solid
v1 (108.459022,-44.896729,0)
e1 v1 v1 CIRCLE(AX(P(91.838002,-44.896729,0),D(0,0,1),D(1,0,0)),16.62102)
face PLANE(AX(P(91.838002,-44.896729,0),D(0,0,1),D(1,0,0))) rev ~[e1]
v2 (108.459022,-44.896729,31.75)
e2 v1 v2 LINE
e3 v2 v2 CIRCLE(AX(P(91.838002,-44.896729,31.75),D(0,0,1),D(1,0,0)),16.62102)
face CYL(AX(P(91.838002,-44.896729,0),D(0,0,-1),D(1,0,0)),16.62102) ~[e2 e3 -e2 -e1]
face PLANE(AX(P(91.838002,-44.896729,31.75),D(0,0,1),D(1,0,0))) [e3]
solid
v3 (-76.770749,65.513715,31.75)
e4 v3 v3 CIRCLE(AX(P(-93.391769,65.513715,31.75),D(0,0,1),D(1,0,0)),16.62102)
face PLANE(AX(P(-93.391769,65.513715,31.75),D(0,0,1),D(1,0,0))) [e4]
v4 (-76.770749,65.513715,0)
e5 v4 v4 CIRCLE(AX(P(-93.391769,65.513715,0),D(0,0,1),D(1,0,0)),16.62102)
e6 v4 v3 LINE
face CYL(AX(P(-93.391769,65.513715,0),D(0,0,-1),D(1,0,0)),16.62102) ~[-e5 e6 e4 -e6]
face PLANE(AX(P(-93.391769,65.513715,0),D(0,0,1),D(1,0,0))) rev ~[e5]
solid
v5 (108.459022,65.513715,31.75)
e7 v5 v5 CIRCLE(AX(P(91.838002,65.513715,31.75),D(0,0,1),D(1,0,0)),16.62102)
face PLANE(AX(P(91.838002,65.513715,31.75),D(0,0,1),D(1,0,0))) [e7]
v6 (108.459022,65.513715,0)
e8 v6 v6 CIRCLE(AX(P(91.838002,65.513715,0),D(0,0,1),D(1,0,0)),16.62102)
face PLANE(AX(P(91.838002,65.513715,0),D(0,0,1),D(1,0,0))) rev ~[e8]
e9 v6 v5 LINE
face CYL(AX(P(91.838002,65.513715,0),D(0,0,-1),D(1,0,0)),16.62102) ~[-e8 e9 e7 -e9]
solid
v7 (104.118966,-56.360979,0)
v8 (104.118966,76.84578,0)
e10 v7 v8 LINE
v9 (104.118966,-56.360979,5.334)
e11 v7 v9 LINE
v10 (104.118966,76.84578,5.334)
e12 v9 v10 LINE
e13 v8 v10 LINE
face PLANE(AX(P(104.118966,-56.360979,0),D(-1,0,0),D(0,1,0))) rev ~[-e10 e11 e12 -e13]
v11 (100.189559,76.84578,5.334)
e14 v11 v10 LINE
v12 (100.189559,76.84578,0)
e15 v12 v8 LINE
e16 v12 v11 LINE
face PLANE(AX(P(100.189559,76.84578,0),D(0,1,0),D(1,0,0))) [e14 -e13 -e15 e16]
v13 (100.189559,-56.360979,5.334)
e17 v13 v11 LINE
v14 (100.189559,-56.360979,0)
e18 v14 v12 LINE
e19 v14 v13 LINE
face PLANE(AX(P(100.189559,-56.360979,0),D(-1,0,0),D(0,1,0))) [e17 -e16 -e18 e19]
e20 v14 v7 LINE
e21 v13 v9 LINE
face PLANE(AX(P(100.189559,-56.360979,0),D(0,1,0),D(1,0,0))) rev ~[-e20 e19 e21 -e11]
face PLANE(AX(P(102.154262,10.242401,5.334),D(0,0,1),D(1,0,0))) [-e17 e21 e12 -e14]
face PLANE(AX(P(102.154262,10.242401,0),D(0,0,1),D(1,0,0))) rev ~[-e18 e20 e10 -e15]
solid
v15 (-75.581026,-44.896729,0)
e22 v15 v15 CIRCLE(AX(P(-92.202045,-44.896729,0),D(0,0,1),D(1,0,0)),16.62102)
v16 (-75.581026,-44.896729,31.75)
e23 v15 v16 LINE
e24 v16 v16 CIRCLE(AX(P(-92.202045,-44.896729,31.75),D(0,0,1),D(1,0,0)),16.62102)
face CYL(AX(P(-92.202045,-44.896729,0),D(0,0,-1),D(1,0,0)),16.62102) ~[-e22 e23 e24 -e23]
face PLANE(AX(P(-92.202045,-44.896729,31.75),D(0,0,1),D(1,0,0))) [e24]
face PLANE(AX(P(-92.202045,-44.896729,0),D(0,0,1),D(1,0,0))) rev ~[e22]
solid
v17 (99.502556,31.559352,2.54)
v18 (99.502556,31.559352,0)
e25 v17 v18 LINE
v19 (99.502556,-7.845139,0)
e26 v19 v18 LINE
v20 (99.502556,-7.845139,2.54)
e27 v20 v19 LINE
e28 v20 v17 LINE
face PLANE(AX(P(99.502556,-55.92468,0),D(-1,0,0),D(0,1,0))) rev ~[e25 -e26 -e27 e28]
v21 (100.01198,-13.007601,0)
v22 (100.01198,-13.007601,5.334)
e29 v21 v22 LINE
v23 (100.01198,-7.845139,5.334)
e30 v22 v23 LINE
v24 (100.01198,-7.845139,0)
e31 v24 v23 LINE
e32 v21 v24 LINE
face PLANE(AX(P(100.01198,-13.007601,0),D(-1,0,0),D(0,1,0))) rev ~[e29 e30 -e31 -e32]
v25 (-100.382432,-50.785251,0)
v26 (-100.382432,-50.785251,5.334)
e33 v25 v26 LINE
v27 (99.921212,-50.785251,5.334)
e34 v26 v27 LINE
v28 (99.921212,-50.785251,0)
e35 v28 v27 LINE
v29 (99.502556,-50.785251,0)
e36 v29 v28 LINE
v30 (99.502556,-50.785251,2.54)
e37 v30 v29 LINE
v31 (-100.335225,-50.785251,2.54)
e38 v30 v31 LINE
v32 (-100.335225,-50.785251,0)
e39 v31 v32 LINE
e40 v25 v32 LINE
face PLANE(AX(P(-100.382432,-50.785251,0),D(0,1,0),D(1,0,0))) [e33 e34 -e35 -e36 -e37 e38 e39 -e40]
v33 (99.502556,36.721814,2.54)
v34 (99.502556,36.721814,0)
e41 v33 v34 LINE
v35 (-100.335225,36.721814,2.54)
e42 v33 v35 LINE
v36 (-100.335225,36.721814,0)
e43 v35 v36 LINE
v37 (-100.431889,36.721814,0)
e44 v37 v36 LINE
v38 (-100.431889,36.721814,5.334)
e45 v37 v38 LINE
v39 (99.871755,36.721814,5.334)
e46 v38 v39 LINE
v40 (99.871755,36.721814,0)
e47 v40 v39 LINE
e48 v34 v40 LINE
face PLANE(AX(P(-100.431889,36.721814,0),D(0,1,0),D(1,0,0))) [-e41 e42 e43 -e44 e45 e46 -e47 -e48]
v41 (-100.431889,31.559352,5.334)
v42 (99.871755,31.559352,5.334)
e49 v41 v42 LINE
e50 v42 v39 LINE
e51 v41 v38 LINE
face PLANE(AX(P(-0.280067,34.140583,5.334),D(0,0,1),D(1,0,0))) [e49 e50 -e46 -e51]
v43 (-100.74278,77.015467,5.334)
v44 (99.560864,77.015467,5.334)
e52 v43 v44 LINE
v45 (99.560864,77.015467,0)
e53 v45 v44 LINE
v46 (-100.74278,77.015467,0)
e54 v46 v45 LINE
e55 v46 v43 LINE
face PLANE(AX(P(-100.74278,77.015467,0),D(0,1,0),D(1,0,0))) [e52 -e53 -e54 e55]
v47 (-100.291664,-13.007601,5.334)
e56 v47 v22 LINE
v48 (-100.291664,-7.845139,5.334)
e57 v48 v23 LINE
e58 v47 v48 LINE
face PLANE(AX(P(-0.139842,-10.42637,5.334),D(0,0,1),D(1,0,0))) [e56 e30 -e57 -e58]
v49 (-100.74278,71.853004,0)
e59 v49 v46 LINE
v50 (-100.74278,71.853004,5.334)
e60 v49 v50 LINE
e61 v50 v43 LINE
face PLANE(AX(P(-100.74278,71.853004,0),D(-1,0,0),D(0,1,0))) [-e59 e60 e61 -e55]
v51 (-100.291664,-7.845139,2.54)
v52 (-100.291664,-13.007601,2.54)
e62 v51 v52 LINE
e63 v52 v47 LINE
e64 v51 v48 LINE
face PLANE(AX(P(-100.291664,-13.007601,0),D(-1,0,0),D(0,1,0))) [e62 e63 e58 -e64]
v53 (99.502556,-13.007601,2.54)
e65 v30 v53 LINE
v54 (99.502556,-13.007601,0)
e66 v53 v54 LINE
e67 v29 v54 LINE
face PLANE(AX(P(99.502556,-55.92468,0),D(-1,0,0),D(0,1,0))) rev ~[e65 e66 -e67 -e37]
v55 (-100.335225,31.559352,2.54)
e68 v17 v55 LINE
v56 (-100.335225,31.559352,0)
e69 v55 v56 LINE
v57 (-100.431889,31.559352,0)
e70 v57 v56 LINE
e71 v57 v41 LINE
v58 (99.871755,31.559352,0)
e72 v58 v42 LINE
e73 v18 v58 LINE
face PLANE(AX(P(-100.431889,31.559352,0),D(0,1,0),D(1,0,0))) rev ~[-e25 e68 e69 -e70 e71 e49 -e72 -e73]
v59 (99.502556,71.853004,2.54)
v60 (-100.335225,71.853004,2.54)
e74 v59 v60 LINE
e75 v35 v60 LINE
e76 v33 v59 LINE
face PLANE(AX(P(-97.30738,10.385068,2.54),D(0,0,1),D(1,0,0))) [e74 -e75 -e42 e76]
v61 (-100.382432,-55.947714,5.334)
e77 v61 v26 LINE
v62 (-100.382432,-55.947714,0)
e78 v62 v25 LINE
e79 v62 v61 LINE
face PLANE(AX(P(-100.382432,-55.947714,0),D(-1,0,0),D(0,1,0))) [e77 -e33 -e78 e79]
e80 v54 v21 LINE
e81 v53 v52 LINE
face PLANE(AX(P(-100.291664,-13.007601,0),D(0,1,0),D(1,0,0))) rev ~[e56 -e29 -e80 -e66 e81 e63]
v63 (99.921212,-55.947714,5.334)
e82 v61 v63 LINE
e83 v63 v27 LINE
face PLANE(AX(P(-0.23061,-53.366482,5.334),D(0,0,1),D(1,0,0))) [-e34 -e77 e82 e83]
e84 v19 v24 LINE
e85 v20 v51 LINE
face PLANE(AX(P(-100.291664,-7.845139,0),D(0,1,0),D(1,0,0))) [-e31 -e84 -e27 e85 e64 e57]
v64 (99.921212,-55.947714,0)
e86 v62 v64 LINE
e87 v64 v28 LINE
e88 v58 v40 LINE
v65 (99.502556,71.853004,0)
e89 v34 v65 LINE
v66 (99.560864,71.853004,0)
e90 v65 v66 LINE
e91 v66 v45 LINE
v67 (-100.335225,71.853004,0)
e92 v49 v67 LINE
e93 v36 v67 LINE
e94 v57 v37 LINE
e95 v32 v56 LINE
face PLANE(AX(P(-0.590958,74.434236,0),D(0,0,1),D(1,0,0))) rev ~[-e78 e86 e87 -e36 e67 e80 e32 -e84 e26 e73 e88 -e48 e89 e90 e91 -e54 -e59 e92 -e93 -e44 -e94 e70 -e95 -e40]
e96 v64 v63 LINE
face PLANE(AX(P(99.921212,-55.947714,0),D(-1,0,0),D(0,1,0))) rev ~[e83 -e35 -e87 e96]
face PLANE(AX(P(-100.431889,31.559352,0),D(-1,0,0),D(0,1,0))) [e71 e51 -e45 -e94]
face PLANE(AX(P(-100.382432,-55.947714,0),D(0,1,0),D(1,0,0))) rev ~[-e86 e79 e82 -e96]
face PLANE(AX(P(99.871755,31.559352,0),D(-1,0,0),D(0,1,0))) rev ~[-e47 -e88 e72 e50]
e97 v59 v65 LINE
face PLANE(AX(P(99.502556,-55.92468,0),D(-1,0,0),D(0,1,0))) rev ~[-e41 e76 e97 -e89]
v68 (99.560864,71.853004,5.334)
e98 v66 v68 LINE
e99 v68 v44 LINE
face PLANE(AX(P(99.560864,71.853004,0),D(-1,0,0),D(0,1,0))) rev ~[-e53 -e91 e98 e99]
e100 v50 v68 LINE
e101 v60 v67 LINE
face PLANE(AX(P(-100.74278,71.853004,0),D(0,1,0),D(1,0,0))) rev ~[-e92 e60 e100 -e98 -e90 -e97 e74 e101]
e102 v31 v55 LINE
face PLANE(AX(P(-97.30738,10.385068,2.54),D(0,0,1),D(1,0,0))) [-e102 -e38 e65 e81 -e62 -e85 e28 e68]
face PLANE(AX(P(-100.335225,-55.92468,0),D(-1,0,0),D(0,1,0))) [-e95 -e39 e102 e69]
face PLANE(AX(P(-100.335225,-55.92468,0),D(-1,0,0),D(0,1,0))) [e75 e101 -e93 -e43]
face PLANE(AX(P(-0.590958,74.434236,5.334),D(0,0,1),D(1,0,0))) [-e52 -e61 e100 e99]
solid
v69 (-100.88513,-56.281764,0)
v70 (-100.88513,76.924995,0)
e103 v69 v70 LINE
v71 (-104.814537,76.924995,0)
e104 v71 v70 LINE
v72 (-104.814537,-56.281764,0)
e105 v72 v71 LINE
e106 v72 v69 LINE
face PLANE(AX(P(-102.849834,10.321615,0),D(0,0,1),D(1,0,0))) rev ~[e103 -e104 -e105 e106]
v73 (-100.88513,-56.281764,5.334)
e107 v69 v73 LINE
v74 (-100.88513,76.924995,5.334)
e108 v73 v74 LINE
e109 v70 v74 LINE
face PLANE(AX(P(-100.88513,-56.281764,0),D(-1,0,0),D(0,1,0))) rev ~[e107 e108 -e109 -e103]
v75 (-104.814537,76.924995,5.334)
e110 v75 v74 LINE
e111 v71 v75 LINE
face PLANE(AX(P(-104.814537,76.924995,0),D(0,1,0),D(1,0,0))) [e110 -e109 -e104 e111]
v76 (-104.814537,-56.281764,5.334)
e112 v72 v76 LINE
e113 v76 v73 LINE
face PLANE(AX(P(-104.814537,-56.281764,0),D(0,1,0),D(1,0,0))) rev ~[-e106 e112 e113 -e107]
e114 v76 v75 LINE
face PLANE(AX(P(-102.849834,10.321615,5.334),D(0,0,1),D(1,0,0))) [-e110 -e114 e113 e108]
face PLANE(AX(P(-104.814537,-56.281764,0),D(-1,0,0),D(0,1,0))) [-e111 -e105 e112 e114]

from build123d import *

# Parameters (mm, degrees)
F0_W      = 6.0556903481
F0_H      = 132.6194964349
F1_DEPTH  = 2.54
F2_W      = 200.3036439419
F2_H      = 5.1624625921
F4_DEPTH  = 5.334
F5_DEPTH  = 5.334
F6_DEPTH  = 5.334
F7_W      = 3.9294064045
F7_H      = 133.2067586482
F8_DEPTH  = 5.334
F9_R      = 16.621019502
F10_DEPTH = 31.75


# Not quite as in the source:
# - the program builds the solid bodies; features that only make, move or delete a surface that nothing else refers to are left out


with BuildPart() as f1:
    # F0 (on Top) → F1 (new body)
    with BuildSketch(Plane.XY):
        with Locations((-97.3073802888, 10.3850681335)):
            Rectangle(F0_W, F0_H)
        with Locations((-91.2516899407, 10.3850681335)):
            Rectangle(F0_W, F0_H)
        with Locations((-85.1959995925, 10.3850681335)):
            Rectangle(F0_W, F0_H)
        with Locations((-79.1403092444, 10.3850681335)):
            Rectangle(F0_W, F0_H)
        with Locations((-73.0846188962, 10.3850681335)):
            Rectangle(F0_W, F0_H)
        with Locations((-67.0289285481, 10.3850681335)):
            Rectangle(F0_W, F0_H)
        with Locations((-60.9732381999, 10.3850681335)):
            Rectangle(F0_W, F0_H)
        with Locations((-54.9175478518, 10.3850681335)):
            Rectangle(F0_W, F0_H)
        with Locations((-48.8618575037, 10.3850681335)):
            Rectangle(F0_W, F0_H)
        with Locations((-42.8061671555, 10.3850681335)):
            Rectangle(F0_W, F0_H)
        with Locations((-36.7504768074, 10.3850681335)):
            Rectangle(F0_W, F0_H)
        with Locations((-30.6947864592, 10.3850681335)):
            Rectangle(F0_W, F0_H)
        with Locations((-24.6390961111, 10.3850681335)):
            Rectangle(F0_W, F0_H)
        with Locations((-18.5834057629, 10.3850681335)):
            Rectangle(F0_W, F0_H)
        with Locations((-12.5277154148, 10.3850681335)):
            Rectangle(F0_W, F0_H)
        with Locations((-6.4720250666, 10.3850681335)):
            Rectangle(F0_W, F0_H)
        with Locations((-0.4163347185, 10.3850681335)):
            Rectangle(F0_W, F0_H)
        with Locations((5.6393556297, 10.3850681335)):
            Rectangle(F0_W, F0_H)
        with Locations((11.6950459778, 10.3850681335)):
            Rectangle(F0_W, F0_H)
        with Locations((17.750736326, 10.3850681335)):
            Rectangle(F0_W, F0_H)
        with Locations((23.8064266741, 10.3850681335)):
            Rectangle(F0_W, F0_H)
        with Locations((29.8621170223, 10.3850681335)):
            Rectangle(F0_W, F0_H)
        with Locations((35.9178073704, 10.3850681335)):
            Rectangle(F0_W, F0_H)
        with Locations((41.9734977186, 10.3850681335)):
            Rectangle(F0_W, F0_H)
        with Locations((48.0291880667, 10.3850681335)):
            Rectangle(F0_W, F0_H)
        with Locations((54.0848784149, 10.3850681335)):
            Rectangle(F0_W, F0_H)
        with Locations((60.140568763, 10.3850681335)):
            Rectangle(F0_W, F0_H)
        with Locations((66.1962591112, 10.3850681335)):
            Rectangle(F0_W, F0_H)
        with Locations((72.2519494593, 10.3850681335)):
            Rectangle(F0_W, F0_H)
        with Locations((78.3076398075, 10.3850681335)):
            Rectangle(F0_W, F0_H)
        with Locations((84.3633301556, 10.3850681335)):
            Rectangle(F0_W, F0_H)
        with Locations((90.4190205038, 10.3850681335)):
            Rectangle(F0_W, F0_H)
        with Locations((96.4747108519, 10.3850681335)):
            Rectangle(F0_W, F0_H)
    extrude(amount=F1_DEPTH)

    # F2 (on Top) → F4 (join)
    with BuildSketch(Plane.XY):
        with Locations((-0.2800673246, 34.1405831277)):
            Rectangle(F2_W, F2_H)
    extrude(amount=F4_DEPTH)

    # F2 (on Top) → F5 (join)
    with BuildSketch(Plane.XY):
        with Locations((-0.1398418099, -10.4263699614)):
            Rectangle(F2_W, F2_H)
    extrude(amount=F5_DEPTH)

    # F2 (on Top) → F6 (join)
    with BuildSketch(Plane.XY):
        with Locations((-0.5909577012, 74.434235692)):
            Rectangle(F2_W, F2_H)
        with Locations((-0.2800673246, 34.1405831277)):
            Rectangle(F2_W, F2_H)
        with Locations((-0.2306103706, -53.3664822578)):
            Rectangle(F2_W, F2_H)
        with Locations((-0.1398418099, -10.4263699614)):
            Rectangle(F2_W, F2_H)
    extrude(amount=F6_DEPTH)


with BuildPart() as f8:
    # F7 (on Top) → F8 (new body)
    with BuildSketch(Plane.XY):
        with Locations((102.1542623639, 10.2424006909)):
            Rectangle(F7_W, F7_H)
    extrude(amount=F8_DEPTH)


with BuildPart() as f8b:
    # F7 (on Top) → F8, piece 2 (new body)
    with BuildSketch(Plane.XY):
        with Locations((-102.8498336673, 10.3216152638)):
            Rectangle(F7_W, F7_H)
    extrude(amount=F8_DEPTH)


with BuildPart() as f10:
    # F9 (on Top) → F10 (new body)
    with BuildSketch(Plane.XY):
        with Locations((91.8380022049, 65.513715148)):
            Circle(F9_R)
    extrude(amount=F10_DEPTH)


with BuildPart() as f10b:
    # F9 (on Top) → F10, piece 2 (new body)
    with BuildSketch(Plane.XY):
        with Locations((91.8380022049, -44.8967292905)):
            Circle(F9_R)
    extrude(amount=F10_DEPTH)


with BuildPart() as f10c:
    # F9 (on Top) → F10, piece 3 (new body)
    with BuildSketch(Plane.XY):
        with Locations((-93.3917686343, 65.513715148)):
            Circle(F9_R)
    extrude(amount=F10_DEPTH)


with BuildPart() as f10d:
    # F9 (on Top) → F10, piece 4 (new body)
    with BuildSketch(Plane.XY):
        with Locations((-92.2020450234, -44.8967292905)):
            Circle(F9_R)
    extrude(amount=F10_DEPTH)


solid = Compound([f1.part, f8.part, f8b.part, f10.part, f10b.part, f10c.part, f10d.part])
